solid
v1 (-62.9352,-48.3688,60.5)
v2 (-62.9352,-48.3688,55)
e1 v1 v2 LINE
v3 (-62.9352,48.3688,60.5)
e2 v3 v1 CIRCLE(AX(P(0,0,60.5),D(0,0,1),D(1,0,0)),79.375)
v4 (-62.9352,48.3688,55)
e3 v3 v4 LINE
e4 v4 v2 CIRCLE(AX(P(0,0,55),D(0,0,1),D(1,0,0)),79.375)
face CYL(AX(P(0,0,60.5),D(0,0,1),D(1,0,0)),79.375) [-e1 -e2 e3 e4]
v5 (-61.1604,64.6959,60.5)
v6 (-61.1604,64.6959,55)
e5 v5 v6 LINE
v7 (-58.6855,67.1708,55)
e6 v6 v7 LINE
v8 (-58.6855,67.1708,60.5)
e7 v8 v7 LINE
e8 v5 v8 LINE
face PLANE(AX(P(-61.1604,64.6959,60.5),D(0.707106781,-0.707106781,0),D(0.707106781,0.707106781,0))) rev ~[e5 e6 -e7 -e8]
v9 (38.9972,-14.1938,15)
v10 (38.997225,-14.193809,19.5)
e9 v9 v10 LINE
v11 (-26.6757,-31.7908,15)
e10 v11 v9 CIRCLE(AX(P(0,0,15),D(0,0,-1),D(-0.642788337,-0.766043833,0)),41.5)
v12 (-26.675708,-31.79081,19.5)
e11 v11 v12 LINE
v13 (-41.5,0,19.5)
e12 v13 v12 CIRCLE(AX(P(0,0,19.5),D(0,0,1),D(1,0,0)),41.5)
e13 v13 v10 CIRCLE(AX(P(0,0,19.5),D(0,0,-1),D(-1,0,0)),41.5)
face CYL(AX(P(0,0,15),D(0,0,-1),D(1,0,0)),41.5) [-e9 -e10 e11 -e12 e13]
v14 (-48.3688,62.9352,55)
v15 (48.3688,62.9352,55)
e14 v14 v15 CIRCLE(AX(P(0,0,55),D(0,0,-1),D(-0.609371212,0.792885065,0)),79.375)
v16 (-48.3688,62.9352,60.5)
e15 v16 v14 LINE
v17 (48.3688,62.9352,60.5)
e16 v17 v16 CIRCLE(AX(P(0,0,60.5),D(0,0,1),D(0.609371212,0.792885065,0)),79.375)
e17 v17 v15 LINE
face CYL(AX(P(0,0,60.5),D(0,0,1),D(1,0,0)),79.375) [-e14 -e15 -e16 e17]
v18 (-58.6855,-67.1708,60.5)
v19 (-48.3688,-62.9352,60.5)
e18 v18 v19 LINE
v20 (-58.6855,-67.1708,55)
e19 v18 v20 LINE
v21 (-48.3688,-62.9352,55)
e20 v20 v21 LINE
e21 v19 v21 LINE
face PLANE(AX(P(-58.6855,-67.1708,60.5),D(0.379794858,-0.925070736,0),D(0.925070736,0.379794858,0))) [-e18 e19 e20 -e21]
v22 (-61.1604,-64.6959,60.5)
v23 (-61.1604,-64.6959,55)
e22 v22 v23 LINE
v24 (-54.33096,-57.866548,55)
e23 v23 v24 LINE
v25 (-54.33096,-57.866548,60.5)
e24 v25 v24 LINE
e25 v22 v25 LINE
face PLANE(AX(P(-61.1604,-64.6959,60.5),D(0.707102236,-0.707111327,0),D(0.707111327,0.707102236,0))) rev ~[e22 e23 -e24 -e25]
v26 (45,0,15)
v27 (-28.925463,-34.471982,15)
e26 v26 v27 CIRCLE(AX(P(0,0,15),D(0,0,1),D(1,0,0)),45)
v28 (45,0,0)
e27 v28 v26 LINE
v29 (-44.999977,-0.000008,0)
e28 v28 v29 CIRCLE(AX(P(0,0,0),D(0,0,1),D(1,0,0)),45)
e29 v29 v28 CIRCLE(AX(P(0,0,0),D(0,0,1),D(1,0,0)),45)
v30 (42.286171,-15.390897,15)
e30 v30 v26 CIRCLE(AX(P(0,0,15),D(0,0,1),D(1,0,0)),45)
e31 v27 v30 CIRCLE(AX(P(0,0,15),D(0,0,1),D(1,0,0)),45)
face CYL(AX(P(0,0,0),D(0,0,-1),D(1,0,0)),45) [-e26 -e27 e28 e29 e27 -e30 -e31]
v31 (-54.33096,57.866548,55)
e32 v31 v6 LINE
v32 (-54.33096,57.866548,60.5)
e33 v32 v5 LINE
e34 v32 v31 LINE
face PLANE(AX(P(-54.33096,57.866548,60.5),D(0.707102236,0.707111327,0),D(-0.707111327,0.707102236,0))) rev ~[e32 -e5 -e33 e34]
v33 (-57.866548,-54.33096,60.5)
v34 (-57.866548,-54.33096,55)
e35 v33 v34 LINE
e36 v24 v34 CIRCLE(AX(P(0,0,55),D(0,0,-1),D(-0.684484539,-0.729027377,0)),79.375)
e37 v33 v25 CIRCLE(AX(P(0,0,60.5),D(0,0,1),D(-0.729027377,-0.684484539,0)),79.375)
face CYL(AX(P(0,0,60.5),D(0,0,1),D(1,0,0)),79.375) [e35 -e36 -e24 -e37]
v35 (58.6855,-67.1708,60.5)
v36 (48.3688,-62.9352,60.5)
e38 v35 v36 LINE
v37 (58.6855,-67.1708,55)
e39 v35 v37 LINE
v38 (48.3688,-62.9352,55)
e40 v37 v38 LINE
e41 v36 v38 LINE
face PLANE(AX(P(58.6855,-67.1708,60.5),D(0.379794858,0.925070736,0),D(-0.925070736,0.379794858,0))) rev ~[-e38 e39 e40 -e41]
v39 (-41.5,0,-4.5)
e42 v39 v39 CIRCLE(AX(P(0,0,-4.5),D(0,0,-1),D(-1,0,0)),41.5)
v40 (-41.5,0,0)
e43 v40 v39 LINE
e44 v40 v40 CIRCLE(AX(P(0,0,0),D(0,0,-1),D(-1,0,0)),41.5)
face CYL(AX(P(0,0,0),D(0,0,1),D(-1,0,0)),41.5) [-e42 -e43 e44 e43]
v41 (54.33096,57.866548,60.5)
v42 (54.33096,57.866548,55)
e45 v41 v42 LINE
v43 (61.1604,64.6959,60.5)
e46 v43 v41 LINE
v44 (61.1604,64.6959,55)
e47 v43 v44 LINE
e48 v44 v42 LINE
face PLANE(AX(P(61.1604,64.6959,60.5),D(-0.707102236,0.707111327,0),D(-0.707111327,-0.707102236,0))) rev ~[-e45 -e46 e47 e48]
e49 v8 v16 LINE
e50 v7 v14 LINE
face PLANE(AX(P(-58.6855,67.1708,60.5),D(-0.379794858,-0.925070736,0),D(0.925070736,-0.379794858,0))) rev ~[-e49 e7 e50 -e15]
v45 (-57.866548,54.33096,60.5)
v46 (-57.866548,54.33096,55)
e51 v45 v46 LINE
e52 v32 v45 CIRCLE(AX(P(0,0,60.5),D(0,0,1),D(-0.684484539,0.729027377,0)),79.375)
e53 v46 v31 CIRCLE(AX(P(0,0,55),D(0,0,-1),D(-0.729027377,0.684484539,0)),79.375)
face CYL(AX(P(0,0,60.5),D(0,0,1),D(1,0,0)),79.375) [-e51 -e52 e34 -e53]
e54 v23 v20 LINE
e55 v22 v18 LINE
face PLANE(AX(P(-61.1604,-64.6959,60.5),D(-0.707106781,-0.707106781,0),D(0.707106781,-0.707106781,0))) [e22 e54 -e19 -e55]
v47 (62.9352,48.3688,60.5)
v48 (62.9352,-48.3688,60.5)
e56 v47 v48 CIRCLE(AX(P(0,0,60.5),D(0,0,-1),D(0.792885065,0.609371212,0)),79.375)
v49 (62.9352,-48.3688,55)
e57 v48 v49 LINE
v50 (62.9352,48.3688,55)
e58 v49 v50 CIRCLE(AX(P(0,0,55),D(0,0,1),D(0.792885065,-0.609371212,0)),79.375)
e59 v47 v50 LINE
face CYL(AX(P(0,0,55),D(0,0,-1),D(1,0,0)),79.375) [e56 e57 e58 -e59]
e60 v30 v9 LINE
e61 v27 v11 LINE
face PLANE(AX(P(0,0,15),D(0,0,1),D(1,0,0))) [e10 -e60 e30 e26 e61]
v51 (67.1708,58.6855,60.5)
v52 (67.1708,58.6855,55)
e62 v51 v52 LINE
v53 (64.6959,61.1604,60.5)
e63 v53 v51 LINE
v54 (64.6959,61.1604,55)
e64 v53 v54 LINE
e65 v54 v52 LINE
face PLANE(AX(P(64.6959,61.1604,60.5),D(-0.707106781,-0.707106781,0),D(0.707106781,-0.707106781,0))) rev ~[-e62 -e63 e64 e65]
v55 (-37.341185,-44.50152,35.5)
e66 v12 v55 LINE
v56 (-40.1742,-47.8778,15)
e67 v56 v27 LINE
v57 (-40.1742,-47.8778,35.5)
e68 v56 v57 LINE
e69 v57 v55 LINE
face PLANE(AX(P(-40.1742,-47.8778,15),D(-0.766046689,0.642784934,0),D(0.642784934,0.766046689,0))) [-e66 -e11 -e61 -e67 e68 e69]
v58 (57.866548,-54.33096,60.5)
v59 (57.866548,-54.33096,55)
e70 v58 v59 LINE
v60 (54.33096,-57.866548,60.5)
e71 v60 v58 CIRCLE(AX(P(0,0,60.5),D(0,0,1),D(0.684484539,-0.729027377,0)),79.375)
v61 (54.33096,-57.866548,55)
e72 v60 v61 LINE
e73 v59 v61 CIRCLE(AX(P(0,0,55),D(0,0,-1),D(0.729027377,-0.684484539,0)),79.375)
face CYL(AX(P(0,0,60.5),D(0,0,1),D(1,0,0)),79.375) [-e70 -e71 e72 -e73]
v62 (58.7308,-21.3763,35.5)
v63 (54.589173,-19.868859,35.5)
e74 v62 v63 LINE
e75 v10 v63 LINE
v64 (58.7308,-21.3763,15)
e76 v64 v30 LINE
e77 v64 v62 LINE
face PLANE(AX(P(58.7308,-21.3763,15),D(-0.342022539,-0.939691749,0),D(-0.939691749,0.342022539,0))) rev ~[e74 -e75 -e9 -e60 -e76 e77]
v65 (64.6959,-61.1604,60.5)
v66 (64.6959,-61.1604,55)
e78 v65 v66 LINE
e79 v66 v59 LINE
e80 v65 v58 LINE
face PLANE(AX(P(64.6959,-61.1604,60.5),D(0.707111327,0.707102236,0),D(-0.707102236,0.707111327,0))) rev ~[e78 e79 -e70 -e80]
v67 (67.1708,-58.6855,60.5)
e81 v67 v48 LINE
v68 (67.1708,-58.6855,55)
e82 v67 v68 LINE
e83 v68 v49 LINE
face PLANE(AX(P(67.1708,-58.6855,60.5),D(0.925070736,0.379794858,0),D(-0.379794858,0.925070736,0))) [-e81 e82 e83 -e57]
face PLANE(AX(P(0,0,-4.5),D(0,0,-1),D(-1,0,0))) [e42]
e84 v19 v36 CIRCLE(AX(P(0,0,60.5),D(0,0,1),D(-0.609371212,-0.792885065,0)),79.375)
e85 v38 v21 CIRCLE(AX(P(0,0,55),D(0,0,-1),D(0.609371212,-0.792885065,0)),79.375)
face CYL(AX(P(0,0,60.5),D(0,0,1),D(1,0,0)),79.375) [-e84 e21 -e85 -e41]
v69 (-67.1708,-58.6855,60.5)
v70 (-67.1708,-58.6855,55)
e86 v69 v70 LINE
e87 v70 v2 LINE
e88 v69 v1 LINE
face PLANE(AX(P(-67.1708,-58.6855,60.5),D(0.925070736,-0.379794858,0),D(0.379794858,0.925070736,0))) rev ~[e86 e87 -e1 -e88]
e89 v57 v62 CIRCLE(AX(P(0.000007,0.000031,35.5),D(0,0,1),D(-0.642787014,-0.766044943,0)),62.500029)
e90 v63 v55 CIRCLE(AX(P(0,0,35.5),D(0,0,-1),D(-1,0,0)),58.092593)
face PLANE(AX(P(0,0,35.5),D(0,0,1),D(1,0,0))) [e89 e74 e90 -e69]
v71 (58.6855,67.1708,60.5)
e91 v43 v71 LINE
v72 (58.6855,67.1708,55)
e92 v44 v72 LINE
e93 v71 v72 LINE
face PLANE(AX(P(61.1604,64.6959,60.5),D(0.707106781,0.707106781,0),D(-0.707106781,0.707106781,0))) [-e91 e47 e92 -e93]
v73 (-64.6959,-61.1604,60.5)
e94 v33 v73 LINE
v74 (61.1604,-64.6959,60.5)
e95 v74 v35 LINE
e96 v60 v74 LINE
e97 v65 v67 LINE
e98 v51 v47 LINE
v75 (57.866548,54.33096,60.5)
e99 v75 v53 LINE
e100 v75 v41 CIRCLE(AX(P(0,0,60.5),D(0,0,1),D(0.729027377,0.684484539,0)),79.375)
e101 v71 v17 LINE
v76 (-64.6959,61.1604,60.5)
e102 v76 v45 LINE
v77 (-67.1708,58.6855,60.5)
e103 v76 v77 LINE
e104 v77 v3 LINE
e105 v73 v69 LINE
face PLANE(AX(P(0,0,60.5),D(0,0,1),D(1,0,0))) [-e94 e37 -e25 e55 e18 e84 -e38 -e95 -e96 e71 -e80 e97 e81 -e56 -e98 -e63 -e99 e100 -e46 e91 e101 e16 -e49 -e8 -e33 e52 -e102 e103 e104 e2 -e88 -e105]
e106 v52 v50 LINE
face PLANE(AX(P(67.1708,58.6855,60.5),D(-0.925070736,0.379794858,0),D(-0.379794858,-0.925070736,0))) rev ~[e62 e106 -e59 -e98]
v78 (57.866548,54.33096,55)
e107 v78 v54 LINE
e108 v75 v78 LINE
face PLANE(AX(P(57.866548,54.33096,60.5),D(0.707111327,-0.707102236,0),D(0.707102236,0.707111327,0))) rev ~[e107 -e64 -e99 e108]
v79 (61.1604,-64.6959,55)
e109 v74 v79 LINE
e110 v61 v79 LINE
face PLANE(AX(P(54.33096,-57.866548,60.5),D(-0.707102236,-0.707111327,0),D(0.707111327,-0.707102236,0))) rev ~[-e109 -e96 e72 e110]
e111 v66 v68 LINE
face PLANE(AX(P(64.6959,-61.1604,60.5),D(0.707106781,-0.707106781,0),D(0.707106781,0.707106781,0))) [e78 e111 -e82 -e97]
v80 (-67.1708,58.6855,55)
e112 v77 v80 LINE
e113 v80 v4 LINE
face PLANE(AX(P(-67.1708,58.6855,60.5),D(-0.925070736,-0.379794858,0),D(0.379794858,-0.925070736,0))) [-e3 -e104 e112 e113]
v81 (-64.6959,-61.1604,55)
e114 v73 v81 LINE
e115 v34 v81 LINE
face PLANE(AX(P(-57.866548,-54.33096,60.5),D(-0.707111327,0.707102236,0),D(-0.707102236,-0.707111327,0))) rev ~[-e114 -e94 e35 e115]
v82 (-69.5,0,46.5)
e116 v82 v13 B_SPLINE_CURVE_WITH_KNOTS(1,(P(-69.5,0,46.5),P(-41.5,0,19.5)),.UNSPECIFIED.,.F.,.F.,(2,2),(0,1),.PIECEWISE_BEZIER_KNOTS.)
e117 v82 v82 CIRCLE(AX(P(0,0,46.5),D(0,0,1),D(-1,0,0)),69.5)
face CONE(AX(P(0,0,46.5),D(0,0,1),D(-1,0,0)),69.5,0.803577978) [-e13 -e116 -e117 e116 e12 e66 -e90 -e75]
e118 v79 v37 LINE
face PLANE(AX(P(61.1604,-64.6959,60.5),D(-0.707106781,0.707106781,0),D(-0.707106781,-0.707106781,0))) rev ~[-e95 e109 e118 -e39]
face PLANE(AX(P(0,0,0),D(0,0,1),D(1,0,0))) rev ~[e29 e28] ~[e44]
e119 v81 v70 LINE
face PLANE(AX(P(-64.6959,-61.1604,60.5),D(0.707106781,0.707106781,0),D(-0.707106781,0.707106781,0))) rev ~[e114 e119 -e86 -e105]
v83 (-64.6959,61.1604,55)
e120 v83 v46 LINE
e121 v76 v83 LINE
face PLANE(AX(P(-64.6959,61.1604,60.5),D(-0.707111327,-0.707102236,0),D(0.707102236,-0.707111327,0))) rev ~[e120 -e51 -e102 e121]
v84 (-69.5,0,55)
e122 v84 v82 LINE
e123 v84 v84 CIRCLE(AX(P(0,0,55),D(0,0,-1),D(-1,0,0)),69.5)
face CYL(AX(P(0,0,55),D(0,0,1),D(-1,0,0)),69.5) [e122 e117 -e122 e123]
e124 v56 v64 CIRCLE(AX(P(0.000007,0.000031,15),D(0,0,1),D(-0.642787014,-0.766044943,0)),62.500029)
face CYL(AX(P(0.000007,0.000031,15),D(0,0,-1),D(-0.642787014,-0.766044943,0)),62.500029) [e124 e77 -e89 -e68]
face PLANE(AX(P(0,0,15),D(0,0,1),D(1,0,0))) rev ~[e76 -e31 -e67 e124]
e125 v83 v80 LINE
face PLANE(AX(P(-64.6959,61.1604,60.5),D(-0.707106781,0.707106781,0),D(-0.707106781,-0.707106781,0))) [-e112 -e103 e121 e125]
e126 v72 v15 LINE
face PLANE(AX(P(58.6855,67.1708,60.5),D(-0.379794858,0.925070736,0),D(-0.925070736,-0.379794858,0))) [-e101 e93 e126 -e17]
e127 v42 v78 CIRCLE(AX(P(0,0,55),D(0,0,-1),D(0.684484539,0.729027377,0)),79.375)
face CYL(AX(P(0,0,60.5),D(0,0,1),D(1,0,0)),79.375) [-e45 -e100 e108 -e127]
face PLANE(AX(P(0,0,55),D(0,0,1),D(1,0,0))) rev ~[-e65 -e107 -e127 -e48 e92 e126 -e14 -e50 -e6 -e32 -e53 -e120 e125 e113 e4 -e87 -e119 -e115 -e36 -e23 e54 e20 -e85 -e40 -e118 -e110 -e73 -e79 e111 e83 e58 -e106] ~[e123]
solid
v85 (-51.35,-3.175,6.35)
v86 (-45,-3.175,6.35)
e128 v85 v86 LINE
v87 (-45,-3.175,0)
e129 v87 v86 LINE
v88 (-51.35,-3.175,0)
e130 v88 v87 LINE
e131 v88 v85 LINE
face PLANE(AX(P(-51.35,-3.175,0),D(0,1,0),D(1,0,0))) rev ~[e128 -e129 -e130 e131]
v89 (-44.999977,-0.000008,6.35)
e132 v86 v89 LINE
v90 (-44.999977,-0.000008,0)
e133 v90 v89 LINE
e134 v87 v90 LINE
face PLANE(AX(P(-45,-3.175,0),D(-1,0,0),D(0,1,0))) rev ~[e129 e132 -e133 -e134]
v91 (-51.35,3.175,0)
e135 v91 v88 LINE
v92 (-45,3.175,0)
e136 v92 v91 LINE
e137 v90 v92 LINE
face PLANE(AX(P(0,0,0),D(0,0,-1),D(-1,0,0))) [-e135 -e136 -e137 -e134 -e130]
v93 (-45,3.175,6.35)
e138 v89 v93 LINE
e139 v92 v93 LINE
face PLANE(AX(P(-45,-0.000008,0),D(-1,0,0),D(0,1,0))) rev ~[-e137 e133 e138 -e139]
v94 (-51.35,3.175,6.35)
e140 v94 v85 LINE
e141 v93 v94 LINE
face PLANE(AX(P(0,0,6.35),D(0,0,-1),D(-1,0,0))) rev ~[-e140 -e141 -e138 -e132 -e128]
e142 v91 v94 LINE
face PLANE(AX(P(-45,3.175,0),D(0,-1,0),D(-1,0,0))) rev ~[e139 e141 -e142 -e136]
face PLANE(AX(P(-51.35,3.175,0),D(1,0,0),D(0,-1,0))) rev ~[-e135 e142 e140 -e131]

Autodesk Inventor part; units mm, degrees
ref_plane "YZ Plane" through (0, 0, 0) normal (1, 0, 0) x (0, 1, 0)
ref_plane "XZ Plane" through (0, 0, 0) normal (0, 1, 0) x (-1, 0, 0)
sketch "Sketch1" plane through (0, 0, 0) normal (0, 0, 1) x (1, 0, 0)
  circle A0 centre (0, 0) radius 45
  dimension "d0" = 90
extrude "Extrusion1" add sketch "Sketch1" along normal blind 15
sketch "Sketch2" plane through (0, 0, 0) normal (0, 0, -1) x (-1, 0, 0)
  circle A0 centre (0, 0) radius 41.5
  dimension "d3" = 83
extrude "Extrusion2" add sketch "Sketch2" along normal blind 4.5
sketch "Sketch3" plane through (0, 0, 15) normal (0, 0, 1) x (1, 0, 0)
  circle A0 centre (0, 0) radius 41.5
  circle A1 centre (0, 0) radius 41.5 projected
extrude "Extrusion3" add sketch "Sketch3" along normal blind 4.5
ref_plane "Work Plane1" through (0, 0, 55) normal (0, 0, -1) x (-1, 0, 0)
sketch "Sketch4" plane through (0, 0, 55) normal (0, 0, -1) x (-1, 0, 0)
  circle A0 centre (0, 0) radius 69.5
  dimension "d9" = 139
extrude "Extrusion4" add sketch "Sketch4" along normal blind 8.5
loft "Loft1" add section 1 edges at (69.5, 0, 46.5) section 2 edges at (-41.5, 0, 19.5)
sketch "Sketch5" plane through (0, 0, 15) normal (0, 0, 1) x (1, 0, 0)
  circle A0 centre (0, 0) radius 69.5 projected
  circle A1 centre (0, 0) radius 41.5 projected
  circle A2 centre (0, 0) radius 41.5 projected
  arc A3 (-40.1742, -47.8778) -> (58.7308, -21.3763) centre (0, 0) ccw
  line L0 (58.7308, -21.3763) -> (38.9972, -14.1938)
  circle A4 centre (0, 0) radius 41.5 projected
  line L1 (-40.1742, -47.8778) -> (-26.6757, -31.7908)
  line L2 (0, 0) -> (24.5458, 0) construction
  dimension "d16" = 21
  dimension "d17" = 20
  dimension "d18" = 50
extrude "Extrusion5" add sketch "Sketch5" along normal blind 20.5 contours A1 L0 A3 L1
sketch "Sketch6" plane through (0, 0, 55) normal (0, 0, 1) x (1, 0, 0)
  circle A0 centre (0, 0) radius 79.375
  dimension "d21" = 158.75
extrude "Extrusion6" add sketch "Sketch6" along normal blind 5.5
sketch "Sketch7" plane through (0, 0, 60.5) normal (0, 0, 1) x (1, 0, 0)
  circle A0 centre (0, 0) radius 79.375 projected
  line L0 (-90.0773, 90.0773) -> (90.0773, -90.0773)
  line L1 (93.9163, 93.9163) -> (-93.9163, -93.9163)
  line L2 (0, 101.3033) -> (0, -101.3033)
  line L3 (-62.9282, 62.9282) -> (-55.15, 55.15) construction
  line L4 (-64.6959, 61.1604) -> (-56.9178, 53.3822)
  line L5 (-53.3822, 56.9178) -> (-61.1604, 64.6959)
  arc A1 (-61.1604, 64.6959) -> (-64.6959, 61.1604) centre (-62.9282, 62.9282) ccw
  arc A2 (-56.9178, 53.3822) -> (-53.3822, 56.9178) centre (-55.15, 55.15) ccw
  line L6 (62.9282, 62.9282) -> (55.15, 55.15) construction
  line L7 (61.1604, 64.6959) -> (53.3822, 56.9178)
  line L8 (56.9178, 53.3822) -> (64.6959, 61.1604)
  arc A3 (64.6959, 61.1604) -> (61.1604, 64.6959) centre (62.9282, 62.9282) ccw
  arc A4 (53.3822, 56.9178) -> (56.9178, 53.3822) centre (55.15, 55.15) ccw
  line L9 (-55.15, -55.15) -> (-62.9282, -62.9282) construction
  line L10 (-56.9178, -53.3822) -> (-64.6959, -61.1604)
  line L11 (-61.1604, -64.6959) -> (-53.3822, -56.9178)
  arc A5 (-53.3822, -56.9178) -> (-56.9178, -53.3822) centre (-55.15, -55.15) ccw
  arc A6 (-64.6959, -61.1604) -> (-61.1604, -64.6959) centre (-62.9282, -62.9282) ccw
  line L12 (55.15, -55.15) -> (62.9282, -62.9282) construction
  line L13 (53.3822, -56.9178) -> (61.1604, -64.6959)
  line L14 (64.6959, -61.1604) -> (56.9178, -53.3822)
  arc A7 (56.9178, -53.3822) -> (53.3822, -56.9178) centre (55.15, -55.15) ccw
  arc A8 (61.1604, -64.6959) -> (64.6959, -61.1604) centre (62.9282, -62.9282) ccw
  line L15 (-61.1604, 64.6959) -> (-58.6855, 67.1708)
  line L16 (-58.6855, 67.1708) -> (-48.3688, 62.9352)
  circle A9 centre (0, 0) radius 79.375 projected
  line L17 (-64.6959, 61.1604) -> (-67.1708, 58.6855)
  line L18 (-67.1708, 58.6855) -> (-62.9352, 48.3688)
  line L19 (64.6959, 61.1604) -> (67.1708, 58.6855)
  line L20 (67.1708, 58.6855) -> (62.9352, 48.3688)
  line L21 (61.1604, 64.6959) -> (58.6855, 67.1708)
  line L22 (58.6855, 67.1708) -> (48.3688, 62.9352)
  line L23 (64.6959, -61.1604) -> (67.1708, -58.6855)
  line L24 (67.1708, -58.6855) -> (62.9352, -48.3688)
  line L25 (61.1604, -64.6959) -> (58.6855, -67.1708)
  line L26 (58.6855, -67.1708) -> (48.3688, -62.9352)
  line L27 (-61.1604, -64.6959) -> (-58.6855, -67.1708)
  line L28 (-58.6855, -67.1708) -> (-48.3688, -62.9352)
  line L29 (-64.6959, -61.1604) -> (-67.1708, -58.6855)
  line L30 (-67.1708, -58.6855) -> (-62.9352, -48.3688)
  point P0 (-59.0391, 59.0391)
  point P1 (59.0391, 59.0391)
  point P2 (-59.0391, -59.0391)
  point P3 (59.0391, -59.0391)
  dimension "d24" = 45
  dimension "d25" = 45
  dimension "d26" = 5
  dimension "d27" = 5
  dimension "d28" = 11
  dimension "d29" = 11
  dimension "d30" = 110.3
  dimension "d31" = 5
  dimension "d32" = 5
  dimension "d33" = 11
  dimension "d34" = 11
  dimension "d35" = 110.3
  dimension "d36" = 3.5
  dimension "d37" = 7.8
  dimension "d38" = 3.5
  dimension "d39" = 7.8
  dimension "d40" = 3.5
  dimension "d41" = 3.5
  dimension "d42" = 7.8
  dimension "d43" = 7.8
  dimension "d44" = 3.5
  dimension "d45" = 3.5
  dimension "d46" = 7.8
  dimension "d47" = 7.8
  dimension "d48" = 3.5
  dimension "d49" = 3.5
  dimension "d50" = 7.8
  dimension "d51" = 7.8
extrude "Extrusion7" add sketch "Sketch7" against normal up to surface (5.5 mm away) contours A0 L14 A7 L0 L1 A4 L8 | A0 L8 L19 L20 | L24 L23 L14 A0 | L8 A4 L1 A0 | A0 L0 A7 L14 | L1 A4 L7 A0 | A0 L13 A7 L0 | L7 A4 L1 L2 A0 | A0 L22 L21 L7 | L13 L25 L26 A0 | A0 L2 L0 A7 L13 | L1 A5 L10 A0 L4 A2 L0 | L2 A0 L11 A5 L1 | L0 A2 L5 A0 L2 | A2 L4 A0 L0 | L0 A0 L5 A2 | A5 L11 A0 L1 | L1 A0 L10 A5 | A0 L5 L15 L16 | L28 L27 L11 A0 | A0 L18 L17 L4 | L10 L29 L30 A0
sketch "Sketch9" plane through (0, 0, 0) normal (0, 0, -1) x (-1, 0, 0)
  arc A0 (28.9254, -34.472) -> (-42.2862, -15.3909) centre (0, 0) ccw projected
  line L0 (45, 3.175) -> (51.35, 3.175)
  line L1 (51.35, 3.175) -> (51.35, -3.175)
  line L2 (51.35, -3.175) -> (45, -3.175)
  line L3 (45, -3.175) -> (45, 3.175)
  point P0 (45, 0)
  dimension "d54" = 6.35
  dimension "d55" = 6.35
extrude "Extrusion8" add sketch "Sketch9" against normal blind 6.35
equation "\"d29\" = d28"
equation "\"d33\" = d28"
equation "\"d34\" = d28"
equation "\"d35\" = d30"
equation "\"d38\" = d36"
equation "\"d39\" = d37"
equation "\"d40\" = d36"
equation "\"d41\" = d40"
equation "\"d42\" = d37"
equation "\"d43\" = d42"
equation "\"d44\" = d36"
equation "\"d45\" = d44"
equation "\"d46\" = d37"
equation "\"d47\" = d46"
equation "\"d48\" = d36"
equation "\"d49\" = d48"
equation "\"d50\" = d39"
equation "\"d51\" = d50"
equation "\"d55\" = d54"
properties part number "speaker"
